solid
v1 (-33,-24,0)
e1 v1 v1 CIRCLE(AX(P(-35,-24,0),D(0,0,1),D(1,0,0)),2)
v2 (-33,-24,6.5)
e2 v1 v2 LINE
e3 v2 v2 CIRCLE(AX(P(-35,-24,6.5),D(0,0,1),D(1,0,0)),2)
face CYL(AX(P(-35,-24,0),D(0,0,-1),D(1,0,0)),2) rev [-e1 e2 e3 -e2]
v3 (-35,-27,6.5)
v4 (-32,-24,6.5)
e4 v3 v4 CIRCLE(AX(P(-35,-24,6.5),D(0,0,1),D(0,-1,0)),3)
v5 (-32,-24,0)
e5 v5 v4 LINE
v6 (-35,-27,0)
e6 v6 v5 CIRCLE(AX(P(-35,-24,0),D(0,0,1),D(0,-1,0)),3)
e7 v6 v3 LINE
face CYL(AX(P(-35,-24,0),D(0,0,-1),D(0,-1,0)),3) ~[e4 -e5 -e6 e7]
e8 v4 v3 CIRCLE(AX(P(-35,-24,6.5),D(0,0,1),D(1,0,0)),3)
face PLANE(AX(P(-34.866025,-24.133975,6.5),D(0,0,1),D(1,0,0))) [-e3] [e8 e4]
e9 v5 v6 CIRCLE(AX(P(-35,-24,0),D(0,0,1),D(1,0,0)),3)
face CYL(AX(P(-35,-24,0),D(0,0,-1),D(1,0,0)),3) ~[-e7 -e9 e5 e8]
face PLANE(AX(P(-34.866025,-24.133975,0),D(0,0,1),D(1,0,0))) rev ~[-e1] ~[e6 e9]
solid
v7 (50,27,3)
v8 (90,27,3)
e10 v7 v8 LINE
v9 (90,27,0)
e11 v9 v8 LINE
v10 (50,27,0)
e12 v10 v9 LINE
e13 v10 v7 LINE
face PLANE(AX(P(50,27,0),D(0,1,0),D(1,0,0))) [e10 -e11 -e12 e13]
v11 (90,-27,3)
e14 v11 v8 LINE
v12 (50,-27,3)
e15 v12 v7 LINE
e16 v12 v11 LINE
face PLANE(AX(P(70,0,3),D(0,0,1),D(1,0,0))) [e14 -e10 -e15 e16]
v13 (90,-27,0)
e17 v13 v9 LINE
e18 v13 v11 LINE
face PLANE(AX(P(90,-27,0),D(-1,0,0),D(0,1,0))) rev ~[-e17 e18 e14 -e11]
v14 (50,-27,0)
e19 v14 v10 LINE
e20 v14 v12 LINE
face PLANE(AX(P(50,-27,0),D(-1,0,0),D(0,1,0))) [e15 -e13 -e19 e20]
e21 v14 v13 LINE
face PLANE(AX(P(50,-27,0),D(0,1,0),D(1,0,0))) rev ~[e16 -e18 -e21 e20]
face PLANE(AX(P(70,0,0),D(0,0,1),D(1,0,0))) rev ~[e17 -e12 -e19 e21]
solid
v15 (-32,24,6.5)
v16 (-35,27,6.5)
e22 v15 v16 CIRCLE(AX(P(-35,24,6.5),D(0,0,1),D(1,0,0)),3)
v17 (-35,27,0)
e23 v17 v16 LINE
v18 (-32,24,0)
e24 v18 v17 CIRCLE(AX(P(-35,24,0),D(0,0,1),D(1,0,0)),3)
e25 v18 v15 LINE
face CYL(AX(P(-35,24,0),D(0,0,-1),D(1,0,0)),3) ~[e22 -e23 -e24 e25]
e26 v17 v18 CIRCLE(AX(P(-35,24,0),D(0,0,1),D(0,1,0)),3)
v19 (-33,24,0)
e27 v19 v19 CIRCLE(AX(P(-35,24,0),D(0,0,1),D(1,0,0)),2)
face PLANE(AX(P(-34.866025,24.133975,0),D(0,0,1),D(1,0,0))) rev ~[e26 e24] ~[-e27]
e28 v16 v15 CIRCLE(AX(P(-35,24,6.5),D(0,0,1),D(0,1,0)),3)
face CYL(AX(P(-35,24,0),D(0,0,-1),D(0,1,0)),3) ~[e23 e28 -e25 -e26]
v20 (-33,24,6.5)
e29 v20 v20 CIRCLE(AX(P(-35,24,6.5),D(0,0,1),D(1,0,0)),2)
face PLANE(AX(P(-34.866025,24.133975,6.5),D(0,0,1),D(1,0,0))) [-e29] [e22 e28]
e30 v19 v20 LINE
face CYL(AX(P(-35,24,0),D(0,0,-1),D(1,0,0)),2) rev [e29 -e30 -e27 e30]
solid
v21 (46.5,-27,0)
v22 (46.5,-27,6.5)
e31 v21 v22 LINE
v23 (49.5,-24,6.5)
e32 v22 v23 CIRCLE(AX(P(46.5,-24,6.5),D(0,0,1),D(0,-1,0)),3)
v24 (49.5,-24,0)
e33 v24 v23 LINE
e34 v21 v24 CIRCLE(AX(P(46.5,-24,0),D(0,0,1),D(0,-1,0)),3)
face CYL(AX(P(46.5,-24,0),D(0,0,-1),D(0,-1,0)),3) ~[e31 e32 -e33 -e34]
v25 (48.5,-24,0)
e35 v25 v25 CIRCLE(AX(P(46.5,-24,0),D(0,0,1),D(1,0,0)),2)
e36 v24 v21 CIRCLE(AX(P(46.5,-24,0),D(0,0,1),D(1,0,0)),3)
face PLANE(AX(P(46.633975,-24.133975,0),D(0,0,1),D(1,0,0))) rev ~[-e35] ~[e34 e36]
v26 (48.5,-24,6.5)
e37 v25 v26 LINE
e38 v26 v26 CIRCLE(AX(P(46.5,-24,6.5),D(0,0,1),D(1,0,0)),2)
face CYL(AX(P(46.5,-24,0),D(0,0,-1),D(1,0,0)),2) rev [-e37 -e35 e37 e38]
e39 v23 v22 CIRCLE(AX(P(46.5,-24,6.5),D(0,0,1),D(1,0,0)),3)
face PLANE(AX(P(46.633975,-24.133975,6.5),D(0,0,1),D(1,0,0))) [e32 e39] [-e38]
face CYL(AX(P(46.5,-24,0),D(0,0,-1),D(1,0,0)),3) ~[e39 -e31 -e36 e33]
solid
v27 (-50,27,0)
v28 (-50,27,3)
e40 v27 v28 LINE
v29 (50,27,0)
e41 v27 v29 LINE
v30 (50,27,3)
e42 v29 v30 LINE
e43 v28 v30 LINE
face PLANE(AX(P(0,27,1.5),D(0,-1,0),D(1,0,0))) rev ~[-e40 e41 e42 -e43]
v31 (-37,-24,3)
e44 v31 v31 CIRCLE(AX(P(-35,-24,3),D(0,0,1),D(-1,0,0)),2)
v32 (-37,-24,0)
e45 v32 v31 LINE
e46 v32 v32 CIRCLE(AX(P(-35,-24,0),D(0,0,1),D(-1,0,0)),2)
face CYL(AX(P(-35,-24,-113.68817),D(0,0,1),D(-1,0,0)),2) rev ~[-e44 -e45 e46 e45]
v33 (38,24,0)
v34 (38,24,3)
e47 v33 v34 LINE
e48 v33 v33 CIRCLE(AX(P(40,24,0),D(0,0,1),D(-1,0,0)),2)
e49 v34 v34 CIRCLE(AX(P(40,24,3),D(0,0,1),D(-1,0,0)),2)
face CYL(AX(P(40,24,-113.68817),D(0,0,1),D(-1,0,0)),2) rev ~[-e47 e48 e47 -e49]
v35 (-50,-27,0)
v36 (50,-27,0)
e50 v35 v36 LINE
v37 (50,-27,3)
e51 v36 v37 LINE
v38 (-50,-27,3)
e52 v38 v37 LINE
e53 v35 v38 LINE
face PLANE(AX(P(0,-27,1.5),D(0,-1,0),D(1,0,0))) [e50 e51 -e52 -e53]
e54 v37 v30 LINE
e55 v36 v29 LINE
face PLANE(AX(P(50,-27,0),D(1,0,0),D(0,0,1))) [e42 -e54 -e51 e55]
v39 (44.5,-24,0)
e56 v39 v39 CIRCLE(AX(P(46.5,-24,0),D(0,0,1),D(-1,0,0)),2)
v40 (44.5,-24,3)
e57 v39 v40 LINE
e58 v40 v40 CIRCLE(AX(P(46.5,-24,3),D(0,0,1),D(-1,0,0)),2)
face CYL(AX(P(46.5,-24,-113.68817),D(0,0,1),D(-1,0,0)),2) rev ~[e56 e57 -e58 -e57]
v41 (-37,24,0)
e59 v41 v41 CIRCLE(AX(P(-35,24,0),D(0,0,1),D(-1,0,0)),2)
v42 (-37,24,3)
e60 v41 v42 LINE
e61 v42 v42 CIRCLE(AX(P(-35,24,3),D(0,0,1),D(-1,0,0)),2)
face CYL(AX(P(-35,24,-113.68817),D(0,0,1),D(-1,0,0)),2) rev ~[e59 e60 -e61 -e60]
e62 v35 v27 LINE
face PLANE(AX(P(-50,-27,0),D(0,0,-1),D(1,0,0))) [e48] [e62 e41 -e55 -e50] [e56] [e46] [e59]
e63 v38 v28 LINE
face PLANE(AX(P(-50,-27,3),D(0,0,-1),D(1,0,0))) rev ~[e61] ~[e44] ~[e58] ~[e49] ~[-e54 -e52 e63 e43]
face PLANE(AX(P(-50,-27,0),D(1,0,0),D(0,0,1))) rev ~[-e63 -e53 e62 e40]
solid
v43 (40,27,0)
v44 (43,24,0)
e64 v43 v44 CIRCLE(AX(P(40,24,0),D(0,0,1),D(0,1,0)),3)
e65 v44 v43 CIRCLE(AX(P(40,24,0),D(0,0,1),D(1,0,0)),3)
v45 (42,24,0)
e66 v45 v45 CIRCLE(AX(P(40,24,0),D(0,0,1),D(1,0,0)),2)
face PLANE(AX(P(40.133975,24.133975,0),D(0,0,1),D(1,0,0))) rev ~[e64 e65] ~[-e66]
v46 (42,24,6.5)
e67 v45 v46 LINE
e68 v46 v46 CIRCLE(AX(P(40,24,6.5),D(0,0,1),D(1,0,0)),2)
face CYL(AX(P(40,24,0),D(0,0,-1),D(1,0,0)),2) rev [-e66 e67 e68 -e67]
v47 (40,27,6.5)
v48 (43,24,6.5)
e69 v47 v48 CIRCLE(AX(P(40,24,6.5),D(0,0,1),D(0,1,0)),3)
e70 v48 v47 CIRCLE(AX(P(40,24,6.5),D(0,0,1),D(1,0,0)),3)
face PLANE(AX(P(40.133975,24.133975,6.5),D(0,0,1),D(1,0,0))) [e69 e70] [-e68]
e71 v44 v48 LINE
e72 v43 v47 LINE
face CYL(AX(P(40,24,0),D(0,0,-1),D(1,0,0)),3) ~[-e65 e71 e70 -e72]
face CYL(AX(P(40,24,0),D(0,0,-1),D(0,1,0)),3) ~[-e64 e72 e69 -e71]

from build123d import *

# Parameters (mm, degrees)
F0_R        = 2
F1_DEPTH    = 6.5
F0_W        = 40
F0_H        = 54
F2_DEPTH    = 3
F3_E0_TOP_W = 100
F3_E0_TOP_H = 3
F4_DEPTH    = 54
F5_D        = 4


with BuildPart() as f1:
    # F0 (on Top) → F1 (new body)
    with BuildSketch(Plane.XY):
        with BuildLine():
            ThreePointArc((-32, -24), (-37.1213203436, -21.8786796564), (-35, -27))
            ThreePointArc((-35, -27), (-32.8786796564, -26.1213203436), (-32, -24))
        make_face()
        with Locations((-35, -24)):
            Circle(F0_R, mode=Mode.SUBTRACT)
    extrude(amount=F1_DEPTH)


with BuildPart() as f1b:
    # F0 (on Top) → F1, piece 2 (new body)
    with BuildSketch(Plane.XY):
        with BuildLine():
            ThreePointArc((-32, 24), (-32.8786796564, 26.1213203436), (-35, 27))
            ThreePointArc((-35, 27), (-37.1213203436, 21.8786796564), (-32, 24))
        make_face()
        with Locations((-35, 24)):
            Circle(F0_R, mode=Mode.SUBTRACT)
    extrude(amount=F1_DEPTH)


with BuildPart() as f1c:
    # F0 (on Top) → F1, piece 3 (new body)
    with BuildSketch(Plane.XY):
        with BuildLine():
            ThreePointArc((43, 24), (42.1213203436, 26.1213203436), (40, 27))
            ThreePointArc((40, 27), (37.8786796564, 21.8786796564), (43, 24))
        make_face()
        with Locations((40, 24)):
            Circle(F0_R, mode=Mode.SUBTRACT)
    extrude(amount=F1_DEPTH)


with BuildPart() as f1d:
    # F0 (on Top) → F1, piece 4 (new body)
    with BuildSketch(Plane.XY):
        with BuildLine():
            ThreePointArc((49.5, -24), (44.3786796564, -21.8786796564), (46.5, -27))
            ThreePointArc((46.5, -27), (48.6213203436, -26.1213203436), (49.5, -24))
        make_face()
        with Locations((46.5, -24)):
            Circle(F0_R, mode=Mode.SUBTRACT)
    extrude(amount=F1_DEPTH)


with BuildPart() as f2:
    # F0 (on Top) → F2 (new body)
    with BuildSketch(Plane.XY):
        with Locations((70, 0)):
            Rectangle(F0_W, F0_H)
    extrude(amount=F2_DEPTH)


with BuildPart() as f4:
    # F3_E0_top (on explicit) → F4 (new body)
    with BuildSketch(Plane(origin=(-50, -27, 0), x_dir=(1, 0, 0), z_dir=(0, -1, 0))):
        with Locations((50, 1.5)):
            Rectangle(F3_E0_TOP_W, F3_E0_TOP_H)
    extrude(amount=-F4_DEPTH)

    # F5 (through all)
    with Locations(Plane(origin=(0, 0, 0), x_dir=(1, 0, 0), z_dir=(0, 0, -1))):
        with Locations((40, -24), (46.5, 24), (-35, 24), (-35, -24)):
            Hole(F5_D / 2)


solid = Compound([f1.part, f1b.part, f1c.part, f1d.part, f2.part, f4.part])
